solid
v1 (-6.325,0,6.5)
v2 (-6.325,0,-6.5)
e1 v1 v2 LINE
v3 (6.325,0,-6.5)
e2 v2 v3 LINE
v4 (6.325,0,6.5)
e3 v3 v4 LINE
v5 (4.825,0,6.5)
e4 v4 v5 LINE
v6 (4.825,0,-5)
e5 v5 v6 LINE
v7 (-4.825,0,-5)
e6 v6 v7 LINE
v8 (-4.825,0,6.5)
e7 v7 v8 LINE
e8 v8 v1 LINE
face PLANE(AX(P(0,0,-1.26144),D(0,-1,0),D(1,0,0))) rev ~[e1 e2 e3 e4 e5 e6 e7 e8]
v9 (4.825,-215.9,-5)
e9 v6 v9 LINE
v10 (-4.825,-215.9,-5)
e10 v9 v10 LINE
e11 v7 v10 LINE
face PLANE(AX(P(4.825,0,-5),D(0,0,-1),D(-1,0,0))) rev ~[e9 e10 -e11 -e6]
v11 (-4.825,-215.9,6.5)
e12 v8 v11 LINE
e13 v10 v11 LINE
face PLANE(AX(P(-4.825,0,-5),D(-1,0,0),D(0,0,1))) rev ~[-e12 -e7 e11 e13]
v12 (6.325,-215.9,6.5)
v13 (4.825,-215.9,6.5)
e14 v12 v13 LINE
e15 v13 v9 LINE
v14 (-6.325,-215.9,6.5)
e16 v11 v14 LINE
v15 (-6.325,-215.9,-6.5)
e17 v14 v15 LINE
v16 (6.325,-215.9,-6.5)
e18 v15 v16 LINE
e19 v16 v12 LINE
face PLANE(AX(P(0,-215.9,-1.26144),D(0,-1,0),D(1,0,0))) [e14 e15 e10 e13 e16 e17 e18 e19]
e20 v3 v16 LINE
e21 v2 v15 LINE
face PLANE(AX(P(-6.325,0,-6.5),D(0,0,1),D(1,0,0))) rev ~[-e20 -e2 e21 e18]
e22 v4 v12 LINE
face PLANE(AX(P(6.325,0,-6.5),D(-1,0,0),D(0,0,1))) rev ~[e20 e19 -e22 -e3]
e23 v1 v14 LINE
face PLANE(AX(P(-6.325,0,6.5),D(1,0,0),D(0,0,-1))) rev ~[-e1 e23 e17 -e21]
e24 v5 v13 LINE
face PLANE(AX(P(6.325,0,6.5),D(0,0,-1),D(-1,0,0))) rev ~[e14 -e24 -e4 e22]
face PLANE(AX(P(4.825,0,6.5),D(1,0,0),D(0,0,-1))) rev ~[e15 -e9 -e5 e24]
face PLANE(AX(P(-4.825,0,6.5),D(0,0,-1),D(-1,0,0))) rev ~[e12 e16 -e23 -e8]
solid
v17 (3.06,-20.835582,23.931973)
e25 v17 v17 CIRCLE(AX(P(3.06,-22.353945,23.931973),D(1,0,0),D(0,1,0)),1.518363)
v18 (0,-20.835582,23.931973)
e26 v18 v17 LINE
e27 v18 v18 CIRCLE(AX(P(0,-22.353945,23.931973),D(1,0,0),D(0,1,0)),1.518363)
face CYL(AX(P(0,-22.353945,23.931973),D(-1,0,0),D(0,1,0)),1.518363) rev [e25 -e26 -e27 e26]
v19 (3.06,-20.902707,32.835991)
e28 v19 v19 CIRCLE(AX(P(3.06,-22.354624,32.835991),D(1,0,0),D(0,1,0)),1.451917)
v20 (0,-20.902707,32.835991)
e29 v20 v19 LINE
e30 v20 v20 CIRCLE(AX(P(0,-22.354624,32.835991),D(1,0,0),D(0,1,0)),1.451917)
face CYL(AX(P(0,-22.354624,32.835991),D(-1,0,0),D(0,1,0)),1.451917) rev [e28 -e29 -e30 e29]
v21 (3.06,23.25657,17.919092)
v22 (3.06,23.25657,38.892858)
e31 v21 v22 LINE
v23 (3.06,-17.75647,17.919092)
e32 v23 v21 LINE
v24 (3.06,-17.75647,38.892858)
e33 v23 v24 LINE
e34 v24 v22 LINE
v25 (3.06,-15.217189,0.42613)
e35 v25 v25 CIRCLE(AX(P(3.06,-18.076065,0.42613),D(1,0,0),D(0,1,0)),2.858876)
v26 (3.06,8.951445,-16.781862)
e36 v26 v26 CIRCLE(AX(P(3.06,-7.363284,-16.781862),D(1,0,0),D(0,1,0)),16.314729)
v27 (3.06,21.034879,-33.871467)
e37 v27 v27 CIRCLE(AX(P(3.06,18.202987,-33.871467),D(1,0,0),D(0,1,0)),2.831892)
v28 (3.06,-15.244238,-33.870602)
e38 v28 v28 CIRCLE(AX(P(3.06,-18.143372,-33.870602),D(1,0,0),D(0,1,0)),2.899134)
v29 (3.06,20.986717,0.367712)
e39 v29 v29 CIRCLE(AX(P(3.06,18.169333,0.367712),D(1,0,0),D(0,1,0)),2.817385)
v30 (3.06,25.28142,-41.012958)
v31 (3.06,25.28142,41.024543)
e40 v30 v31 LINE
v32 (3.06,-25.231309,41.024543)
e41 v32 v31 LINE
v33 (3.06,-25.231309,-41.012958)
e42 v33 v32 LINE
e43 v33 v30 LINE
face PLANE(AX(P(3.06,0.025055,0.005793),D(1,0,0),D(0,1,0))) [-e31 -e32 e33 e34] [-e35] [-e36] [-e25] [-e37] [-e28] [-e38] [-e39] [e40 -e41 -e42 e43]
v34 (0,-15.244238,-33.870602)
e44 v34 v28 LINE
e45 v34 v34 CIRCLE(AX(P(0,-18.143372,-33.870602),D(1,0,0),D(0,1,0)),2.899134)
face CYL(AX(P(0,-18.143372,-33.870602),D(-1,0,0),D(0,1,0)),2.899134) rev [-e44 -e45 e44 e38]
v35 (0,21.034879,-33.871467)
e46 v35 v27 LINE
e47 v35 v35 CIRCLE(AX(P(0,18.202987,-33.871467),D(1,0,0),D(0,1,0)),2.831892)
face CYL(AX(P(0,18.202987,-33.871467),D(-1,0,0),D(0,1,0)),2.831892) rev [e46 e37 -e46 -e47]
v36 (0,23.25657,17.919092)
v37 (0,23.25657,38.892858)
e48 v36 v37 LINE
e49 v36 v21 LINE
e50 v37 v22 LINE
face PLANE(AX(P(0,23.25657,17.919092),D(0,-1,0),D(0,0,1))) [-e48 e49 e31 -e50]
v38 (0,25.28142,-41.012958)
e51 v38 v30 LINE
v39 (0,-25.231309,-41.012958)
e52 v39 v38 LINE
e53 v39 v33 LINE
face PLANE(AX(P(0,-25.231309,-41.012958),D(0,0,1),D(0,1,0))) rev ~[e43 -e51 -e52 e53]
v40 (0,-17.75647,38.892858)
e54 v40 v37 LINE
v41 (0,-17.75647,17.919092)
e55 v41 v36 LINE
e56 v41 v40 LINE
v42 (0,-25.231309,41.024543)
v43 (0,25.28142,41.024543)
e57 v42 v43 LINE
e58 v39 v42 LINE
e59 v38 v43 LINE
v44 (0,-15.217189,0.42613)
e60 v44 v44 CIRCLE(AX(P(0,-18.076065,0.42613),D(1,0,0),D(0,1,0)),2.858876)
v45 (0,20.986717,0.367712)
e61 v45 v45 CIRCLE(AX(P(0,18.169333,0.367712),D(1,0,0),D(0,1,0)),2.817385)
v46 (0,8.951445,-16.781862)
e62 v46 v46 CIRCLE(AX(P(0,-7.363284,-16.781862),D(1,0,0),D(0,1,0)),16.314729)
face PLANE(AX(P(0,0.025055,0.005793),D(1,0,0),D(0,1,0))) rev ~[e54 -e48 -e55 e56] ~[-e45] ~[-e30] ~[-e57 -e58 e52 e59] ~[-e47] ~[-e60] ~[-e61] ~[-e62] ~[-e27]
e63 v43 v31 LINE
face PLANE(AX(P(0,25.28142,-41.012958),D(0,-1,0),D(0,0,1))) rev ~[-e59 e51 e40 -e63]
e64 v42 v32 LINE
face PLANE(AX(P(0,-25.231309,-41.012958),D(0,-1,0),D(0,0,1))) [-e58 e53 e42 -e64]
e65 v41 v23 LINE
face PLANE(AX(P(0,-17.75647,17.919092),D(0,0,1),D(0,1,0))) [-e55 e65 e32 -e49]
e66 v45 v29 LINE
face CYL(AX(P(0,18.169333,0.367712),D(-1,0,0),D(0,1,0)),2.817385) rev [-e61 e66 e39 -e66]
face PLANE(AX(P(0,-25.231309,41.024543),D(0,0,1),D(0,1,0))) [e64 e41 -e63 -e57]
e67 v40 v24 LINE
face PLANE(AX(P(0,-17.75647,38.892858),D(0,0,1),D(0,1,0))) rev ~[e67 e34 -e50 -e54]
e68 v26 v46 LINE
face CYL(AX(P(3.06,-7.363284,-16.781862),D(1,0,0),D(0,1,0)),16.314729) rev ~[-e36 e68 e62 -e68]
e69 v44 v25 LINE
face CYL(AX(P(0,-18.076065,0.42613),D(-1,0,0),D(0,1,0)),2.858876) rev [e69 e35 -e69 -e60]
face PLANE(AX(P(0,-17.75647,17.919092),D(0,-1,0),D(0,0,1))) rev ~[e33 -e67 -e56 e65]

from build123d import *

# Parameters (mm, degrees)
F1_DEPTH = 215.9
F2_W     = 50.5127292126
F2_H     = 82.0375010371
F2_R     = 2.89913405
F2_R_2   = 2.8318920873
F2_R_3   = 2.8588761336
F2_R_4   = 1.5183628154
F2_R_5   = 1.4519166982
F2_R_6   = 2.8173846153
F2_W_2   = 41.0130396485
F2_H_2   = 20.9737662226
F3_DEPTH = 3.06
F5_R     = 16.3147290841
F6_DEPTH = 5


with BuildPart() as f1:
    # F0 (on Front) → F1 (new body)
    with BuildSketch(Plane.XZ):
        Polygon((-4.825, 6.5), (-6.325, 6.5), (-6.325, -6.5), (6.325, -6.5), (6.325, 6.5), (4.825, 6.5), (4.825, -5), (-4.825, -5), align=None)
    extrude(amount=F1_DEPTH)


with BuildPart() as f3:
    # F2 (on Right) → F3 (new body)
    with BuildSketch(Plane.YZ):
        with Locations((0.0250553712, 0.0057928264)):
            Rectangle(F2_W, F2_H)
        with Locations((-18.1433722998, -33.8706020266)):
            Circle(F2_R, mode=Mode.SUBTRACT)
        with Locations((18.2029870339, -33.8714673854)):
            Circle(F2_R_2, mode=Mode.SUBTRACT)
        with Locations((-18.0760649964, 0.4261299481)):
            Circle(F2_R_3, mode=Mode.SUBTRACT)
        with Locations((-22.3539447378, 23.9319726942)):
            Circle(F2_R_4, mode=Mode.SUBTRACT)
        with Locations((-22.3546241195, 32.8359914765)):
            Circle(F2_R_5, mode=Mode.SUBTRACT)
        with Locations((18.1693327613, 0.3677118686)):
            Circle(F2_R_6, mode=Mode.SUBTRACT)
        with Locations((2.7500502765, 28.4059746191)):
            Rectangle(F2_W_2, F2_H_2, mode=Mode.SUBTRACT)
    extrude(amount=F3_DEPTH)

    # F5 (on face) → F6 (cut)
    with BuildSketch(Plane.YZ.offset(3.06)):
        with Locations((-7.363283649, -16.781862238)):
            Circle(F5_R)
    extrude(amount=-F6_DEPTH, mode=Mode.SUBTRACT)


solid = Compound([f1.part, f3.part])
